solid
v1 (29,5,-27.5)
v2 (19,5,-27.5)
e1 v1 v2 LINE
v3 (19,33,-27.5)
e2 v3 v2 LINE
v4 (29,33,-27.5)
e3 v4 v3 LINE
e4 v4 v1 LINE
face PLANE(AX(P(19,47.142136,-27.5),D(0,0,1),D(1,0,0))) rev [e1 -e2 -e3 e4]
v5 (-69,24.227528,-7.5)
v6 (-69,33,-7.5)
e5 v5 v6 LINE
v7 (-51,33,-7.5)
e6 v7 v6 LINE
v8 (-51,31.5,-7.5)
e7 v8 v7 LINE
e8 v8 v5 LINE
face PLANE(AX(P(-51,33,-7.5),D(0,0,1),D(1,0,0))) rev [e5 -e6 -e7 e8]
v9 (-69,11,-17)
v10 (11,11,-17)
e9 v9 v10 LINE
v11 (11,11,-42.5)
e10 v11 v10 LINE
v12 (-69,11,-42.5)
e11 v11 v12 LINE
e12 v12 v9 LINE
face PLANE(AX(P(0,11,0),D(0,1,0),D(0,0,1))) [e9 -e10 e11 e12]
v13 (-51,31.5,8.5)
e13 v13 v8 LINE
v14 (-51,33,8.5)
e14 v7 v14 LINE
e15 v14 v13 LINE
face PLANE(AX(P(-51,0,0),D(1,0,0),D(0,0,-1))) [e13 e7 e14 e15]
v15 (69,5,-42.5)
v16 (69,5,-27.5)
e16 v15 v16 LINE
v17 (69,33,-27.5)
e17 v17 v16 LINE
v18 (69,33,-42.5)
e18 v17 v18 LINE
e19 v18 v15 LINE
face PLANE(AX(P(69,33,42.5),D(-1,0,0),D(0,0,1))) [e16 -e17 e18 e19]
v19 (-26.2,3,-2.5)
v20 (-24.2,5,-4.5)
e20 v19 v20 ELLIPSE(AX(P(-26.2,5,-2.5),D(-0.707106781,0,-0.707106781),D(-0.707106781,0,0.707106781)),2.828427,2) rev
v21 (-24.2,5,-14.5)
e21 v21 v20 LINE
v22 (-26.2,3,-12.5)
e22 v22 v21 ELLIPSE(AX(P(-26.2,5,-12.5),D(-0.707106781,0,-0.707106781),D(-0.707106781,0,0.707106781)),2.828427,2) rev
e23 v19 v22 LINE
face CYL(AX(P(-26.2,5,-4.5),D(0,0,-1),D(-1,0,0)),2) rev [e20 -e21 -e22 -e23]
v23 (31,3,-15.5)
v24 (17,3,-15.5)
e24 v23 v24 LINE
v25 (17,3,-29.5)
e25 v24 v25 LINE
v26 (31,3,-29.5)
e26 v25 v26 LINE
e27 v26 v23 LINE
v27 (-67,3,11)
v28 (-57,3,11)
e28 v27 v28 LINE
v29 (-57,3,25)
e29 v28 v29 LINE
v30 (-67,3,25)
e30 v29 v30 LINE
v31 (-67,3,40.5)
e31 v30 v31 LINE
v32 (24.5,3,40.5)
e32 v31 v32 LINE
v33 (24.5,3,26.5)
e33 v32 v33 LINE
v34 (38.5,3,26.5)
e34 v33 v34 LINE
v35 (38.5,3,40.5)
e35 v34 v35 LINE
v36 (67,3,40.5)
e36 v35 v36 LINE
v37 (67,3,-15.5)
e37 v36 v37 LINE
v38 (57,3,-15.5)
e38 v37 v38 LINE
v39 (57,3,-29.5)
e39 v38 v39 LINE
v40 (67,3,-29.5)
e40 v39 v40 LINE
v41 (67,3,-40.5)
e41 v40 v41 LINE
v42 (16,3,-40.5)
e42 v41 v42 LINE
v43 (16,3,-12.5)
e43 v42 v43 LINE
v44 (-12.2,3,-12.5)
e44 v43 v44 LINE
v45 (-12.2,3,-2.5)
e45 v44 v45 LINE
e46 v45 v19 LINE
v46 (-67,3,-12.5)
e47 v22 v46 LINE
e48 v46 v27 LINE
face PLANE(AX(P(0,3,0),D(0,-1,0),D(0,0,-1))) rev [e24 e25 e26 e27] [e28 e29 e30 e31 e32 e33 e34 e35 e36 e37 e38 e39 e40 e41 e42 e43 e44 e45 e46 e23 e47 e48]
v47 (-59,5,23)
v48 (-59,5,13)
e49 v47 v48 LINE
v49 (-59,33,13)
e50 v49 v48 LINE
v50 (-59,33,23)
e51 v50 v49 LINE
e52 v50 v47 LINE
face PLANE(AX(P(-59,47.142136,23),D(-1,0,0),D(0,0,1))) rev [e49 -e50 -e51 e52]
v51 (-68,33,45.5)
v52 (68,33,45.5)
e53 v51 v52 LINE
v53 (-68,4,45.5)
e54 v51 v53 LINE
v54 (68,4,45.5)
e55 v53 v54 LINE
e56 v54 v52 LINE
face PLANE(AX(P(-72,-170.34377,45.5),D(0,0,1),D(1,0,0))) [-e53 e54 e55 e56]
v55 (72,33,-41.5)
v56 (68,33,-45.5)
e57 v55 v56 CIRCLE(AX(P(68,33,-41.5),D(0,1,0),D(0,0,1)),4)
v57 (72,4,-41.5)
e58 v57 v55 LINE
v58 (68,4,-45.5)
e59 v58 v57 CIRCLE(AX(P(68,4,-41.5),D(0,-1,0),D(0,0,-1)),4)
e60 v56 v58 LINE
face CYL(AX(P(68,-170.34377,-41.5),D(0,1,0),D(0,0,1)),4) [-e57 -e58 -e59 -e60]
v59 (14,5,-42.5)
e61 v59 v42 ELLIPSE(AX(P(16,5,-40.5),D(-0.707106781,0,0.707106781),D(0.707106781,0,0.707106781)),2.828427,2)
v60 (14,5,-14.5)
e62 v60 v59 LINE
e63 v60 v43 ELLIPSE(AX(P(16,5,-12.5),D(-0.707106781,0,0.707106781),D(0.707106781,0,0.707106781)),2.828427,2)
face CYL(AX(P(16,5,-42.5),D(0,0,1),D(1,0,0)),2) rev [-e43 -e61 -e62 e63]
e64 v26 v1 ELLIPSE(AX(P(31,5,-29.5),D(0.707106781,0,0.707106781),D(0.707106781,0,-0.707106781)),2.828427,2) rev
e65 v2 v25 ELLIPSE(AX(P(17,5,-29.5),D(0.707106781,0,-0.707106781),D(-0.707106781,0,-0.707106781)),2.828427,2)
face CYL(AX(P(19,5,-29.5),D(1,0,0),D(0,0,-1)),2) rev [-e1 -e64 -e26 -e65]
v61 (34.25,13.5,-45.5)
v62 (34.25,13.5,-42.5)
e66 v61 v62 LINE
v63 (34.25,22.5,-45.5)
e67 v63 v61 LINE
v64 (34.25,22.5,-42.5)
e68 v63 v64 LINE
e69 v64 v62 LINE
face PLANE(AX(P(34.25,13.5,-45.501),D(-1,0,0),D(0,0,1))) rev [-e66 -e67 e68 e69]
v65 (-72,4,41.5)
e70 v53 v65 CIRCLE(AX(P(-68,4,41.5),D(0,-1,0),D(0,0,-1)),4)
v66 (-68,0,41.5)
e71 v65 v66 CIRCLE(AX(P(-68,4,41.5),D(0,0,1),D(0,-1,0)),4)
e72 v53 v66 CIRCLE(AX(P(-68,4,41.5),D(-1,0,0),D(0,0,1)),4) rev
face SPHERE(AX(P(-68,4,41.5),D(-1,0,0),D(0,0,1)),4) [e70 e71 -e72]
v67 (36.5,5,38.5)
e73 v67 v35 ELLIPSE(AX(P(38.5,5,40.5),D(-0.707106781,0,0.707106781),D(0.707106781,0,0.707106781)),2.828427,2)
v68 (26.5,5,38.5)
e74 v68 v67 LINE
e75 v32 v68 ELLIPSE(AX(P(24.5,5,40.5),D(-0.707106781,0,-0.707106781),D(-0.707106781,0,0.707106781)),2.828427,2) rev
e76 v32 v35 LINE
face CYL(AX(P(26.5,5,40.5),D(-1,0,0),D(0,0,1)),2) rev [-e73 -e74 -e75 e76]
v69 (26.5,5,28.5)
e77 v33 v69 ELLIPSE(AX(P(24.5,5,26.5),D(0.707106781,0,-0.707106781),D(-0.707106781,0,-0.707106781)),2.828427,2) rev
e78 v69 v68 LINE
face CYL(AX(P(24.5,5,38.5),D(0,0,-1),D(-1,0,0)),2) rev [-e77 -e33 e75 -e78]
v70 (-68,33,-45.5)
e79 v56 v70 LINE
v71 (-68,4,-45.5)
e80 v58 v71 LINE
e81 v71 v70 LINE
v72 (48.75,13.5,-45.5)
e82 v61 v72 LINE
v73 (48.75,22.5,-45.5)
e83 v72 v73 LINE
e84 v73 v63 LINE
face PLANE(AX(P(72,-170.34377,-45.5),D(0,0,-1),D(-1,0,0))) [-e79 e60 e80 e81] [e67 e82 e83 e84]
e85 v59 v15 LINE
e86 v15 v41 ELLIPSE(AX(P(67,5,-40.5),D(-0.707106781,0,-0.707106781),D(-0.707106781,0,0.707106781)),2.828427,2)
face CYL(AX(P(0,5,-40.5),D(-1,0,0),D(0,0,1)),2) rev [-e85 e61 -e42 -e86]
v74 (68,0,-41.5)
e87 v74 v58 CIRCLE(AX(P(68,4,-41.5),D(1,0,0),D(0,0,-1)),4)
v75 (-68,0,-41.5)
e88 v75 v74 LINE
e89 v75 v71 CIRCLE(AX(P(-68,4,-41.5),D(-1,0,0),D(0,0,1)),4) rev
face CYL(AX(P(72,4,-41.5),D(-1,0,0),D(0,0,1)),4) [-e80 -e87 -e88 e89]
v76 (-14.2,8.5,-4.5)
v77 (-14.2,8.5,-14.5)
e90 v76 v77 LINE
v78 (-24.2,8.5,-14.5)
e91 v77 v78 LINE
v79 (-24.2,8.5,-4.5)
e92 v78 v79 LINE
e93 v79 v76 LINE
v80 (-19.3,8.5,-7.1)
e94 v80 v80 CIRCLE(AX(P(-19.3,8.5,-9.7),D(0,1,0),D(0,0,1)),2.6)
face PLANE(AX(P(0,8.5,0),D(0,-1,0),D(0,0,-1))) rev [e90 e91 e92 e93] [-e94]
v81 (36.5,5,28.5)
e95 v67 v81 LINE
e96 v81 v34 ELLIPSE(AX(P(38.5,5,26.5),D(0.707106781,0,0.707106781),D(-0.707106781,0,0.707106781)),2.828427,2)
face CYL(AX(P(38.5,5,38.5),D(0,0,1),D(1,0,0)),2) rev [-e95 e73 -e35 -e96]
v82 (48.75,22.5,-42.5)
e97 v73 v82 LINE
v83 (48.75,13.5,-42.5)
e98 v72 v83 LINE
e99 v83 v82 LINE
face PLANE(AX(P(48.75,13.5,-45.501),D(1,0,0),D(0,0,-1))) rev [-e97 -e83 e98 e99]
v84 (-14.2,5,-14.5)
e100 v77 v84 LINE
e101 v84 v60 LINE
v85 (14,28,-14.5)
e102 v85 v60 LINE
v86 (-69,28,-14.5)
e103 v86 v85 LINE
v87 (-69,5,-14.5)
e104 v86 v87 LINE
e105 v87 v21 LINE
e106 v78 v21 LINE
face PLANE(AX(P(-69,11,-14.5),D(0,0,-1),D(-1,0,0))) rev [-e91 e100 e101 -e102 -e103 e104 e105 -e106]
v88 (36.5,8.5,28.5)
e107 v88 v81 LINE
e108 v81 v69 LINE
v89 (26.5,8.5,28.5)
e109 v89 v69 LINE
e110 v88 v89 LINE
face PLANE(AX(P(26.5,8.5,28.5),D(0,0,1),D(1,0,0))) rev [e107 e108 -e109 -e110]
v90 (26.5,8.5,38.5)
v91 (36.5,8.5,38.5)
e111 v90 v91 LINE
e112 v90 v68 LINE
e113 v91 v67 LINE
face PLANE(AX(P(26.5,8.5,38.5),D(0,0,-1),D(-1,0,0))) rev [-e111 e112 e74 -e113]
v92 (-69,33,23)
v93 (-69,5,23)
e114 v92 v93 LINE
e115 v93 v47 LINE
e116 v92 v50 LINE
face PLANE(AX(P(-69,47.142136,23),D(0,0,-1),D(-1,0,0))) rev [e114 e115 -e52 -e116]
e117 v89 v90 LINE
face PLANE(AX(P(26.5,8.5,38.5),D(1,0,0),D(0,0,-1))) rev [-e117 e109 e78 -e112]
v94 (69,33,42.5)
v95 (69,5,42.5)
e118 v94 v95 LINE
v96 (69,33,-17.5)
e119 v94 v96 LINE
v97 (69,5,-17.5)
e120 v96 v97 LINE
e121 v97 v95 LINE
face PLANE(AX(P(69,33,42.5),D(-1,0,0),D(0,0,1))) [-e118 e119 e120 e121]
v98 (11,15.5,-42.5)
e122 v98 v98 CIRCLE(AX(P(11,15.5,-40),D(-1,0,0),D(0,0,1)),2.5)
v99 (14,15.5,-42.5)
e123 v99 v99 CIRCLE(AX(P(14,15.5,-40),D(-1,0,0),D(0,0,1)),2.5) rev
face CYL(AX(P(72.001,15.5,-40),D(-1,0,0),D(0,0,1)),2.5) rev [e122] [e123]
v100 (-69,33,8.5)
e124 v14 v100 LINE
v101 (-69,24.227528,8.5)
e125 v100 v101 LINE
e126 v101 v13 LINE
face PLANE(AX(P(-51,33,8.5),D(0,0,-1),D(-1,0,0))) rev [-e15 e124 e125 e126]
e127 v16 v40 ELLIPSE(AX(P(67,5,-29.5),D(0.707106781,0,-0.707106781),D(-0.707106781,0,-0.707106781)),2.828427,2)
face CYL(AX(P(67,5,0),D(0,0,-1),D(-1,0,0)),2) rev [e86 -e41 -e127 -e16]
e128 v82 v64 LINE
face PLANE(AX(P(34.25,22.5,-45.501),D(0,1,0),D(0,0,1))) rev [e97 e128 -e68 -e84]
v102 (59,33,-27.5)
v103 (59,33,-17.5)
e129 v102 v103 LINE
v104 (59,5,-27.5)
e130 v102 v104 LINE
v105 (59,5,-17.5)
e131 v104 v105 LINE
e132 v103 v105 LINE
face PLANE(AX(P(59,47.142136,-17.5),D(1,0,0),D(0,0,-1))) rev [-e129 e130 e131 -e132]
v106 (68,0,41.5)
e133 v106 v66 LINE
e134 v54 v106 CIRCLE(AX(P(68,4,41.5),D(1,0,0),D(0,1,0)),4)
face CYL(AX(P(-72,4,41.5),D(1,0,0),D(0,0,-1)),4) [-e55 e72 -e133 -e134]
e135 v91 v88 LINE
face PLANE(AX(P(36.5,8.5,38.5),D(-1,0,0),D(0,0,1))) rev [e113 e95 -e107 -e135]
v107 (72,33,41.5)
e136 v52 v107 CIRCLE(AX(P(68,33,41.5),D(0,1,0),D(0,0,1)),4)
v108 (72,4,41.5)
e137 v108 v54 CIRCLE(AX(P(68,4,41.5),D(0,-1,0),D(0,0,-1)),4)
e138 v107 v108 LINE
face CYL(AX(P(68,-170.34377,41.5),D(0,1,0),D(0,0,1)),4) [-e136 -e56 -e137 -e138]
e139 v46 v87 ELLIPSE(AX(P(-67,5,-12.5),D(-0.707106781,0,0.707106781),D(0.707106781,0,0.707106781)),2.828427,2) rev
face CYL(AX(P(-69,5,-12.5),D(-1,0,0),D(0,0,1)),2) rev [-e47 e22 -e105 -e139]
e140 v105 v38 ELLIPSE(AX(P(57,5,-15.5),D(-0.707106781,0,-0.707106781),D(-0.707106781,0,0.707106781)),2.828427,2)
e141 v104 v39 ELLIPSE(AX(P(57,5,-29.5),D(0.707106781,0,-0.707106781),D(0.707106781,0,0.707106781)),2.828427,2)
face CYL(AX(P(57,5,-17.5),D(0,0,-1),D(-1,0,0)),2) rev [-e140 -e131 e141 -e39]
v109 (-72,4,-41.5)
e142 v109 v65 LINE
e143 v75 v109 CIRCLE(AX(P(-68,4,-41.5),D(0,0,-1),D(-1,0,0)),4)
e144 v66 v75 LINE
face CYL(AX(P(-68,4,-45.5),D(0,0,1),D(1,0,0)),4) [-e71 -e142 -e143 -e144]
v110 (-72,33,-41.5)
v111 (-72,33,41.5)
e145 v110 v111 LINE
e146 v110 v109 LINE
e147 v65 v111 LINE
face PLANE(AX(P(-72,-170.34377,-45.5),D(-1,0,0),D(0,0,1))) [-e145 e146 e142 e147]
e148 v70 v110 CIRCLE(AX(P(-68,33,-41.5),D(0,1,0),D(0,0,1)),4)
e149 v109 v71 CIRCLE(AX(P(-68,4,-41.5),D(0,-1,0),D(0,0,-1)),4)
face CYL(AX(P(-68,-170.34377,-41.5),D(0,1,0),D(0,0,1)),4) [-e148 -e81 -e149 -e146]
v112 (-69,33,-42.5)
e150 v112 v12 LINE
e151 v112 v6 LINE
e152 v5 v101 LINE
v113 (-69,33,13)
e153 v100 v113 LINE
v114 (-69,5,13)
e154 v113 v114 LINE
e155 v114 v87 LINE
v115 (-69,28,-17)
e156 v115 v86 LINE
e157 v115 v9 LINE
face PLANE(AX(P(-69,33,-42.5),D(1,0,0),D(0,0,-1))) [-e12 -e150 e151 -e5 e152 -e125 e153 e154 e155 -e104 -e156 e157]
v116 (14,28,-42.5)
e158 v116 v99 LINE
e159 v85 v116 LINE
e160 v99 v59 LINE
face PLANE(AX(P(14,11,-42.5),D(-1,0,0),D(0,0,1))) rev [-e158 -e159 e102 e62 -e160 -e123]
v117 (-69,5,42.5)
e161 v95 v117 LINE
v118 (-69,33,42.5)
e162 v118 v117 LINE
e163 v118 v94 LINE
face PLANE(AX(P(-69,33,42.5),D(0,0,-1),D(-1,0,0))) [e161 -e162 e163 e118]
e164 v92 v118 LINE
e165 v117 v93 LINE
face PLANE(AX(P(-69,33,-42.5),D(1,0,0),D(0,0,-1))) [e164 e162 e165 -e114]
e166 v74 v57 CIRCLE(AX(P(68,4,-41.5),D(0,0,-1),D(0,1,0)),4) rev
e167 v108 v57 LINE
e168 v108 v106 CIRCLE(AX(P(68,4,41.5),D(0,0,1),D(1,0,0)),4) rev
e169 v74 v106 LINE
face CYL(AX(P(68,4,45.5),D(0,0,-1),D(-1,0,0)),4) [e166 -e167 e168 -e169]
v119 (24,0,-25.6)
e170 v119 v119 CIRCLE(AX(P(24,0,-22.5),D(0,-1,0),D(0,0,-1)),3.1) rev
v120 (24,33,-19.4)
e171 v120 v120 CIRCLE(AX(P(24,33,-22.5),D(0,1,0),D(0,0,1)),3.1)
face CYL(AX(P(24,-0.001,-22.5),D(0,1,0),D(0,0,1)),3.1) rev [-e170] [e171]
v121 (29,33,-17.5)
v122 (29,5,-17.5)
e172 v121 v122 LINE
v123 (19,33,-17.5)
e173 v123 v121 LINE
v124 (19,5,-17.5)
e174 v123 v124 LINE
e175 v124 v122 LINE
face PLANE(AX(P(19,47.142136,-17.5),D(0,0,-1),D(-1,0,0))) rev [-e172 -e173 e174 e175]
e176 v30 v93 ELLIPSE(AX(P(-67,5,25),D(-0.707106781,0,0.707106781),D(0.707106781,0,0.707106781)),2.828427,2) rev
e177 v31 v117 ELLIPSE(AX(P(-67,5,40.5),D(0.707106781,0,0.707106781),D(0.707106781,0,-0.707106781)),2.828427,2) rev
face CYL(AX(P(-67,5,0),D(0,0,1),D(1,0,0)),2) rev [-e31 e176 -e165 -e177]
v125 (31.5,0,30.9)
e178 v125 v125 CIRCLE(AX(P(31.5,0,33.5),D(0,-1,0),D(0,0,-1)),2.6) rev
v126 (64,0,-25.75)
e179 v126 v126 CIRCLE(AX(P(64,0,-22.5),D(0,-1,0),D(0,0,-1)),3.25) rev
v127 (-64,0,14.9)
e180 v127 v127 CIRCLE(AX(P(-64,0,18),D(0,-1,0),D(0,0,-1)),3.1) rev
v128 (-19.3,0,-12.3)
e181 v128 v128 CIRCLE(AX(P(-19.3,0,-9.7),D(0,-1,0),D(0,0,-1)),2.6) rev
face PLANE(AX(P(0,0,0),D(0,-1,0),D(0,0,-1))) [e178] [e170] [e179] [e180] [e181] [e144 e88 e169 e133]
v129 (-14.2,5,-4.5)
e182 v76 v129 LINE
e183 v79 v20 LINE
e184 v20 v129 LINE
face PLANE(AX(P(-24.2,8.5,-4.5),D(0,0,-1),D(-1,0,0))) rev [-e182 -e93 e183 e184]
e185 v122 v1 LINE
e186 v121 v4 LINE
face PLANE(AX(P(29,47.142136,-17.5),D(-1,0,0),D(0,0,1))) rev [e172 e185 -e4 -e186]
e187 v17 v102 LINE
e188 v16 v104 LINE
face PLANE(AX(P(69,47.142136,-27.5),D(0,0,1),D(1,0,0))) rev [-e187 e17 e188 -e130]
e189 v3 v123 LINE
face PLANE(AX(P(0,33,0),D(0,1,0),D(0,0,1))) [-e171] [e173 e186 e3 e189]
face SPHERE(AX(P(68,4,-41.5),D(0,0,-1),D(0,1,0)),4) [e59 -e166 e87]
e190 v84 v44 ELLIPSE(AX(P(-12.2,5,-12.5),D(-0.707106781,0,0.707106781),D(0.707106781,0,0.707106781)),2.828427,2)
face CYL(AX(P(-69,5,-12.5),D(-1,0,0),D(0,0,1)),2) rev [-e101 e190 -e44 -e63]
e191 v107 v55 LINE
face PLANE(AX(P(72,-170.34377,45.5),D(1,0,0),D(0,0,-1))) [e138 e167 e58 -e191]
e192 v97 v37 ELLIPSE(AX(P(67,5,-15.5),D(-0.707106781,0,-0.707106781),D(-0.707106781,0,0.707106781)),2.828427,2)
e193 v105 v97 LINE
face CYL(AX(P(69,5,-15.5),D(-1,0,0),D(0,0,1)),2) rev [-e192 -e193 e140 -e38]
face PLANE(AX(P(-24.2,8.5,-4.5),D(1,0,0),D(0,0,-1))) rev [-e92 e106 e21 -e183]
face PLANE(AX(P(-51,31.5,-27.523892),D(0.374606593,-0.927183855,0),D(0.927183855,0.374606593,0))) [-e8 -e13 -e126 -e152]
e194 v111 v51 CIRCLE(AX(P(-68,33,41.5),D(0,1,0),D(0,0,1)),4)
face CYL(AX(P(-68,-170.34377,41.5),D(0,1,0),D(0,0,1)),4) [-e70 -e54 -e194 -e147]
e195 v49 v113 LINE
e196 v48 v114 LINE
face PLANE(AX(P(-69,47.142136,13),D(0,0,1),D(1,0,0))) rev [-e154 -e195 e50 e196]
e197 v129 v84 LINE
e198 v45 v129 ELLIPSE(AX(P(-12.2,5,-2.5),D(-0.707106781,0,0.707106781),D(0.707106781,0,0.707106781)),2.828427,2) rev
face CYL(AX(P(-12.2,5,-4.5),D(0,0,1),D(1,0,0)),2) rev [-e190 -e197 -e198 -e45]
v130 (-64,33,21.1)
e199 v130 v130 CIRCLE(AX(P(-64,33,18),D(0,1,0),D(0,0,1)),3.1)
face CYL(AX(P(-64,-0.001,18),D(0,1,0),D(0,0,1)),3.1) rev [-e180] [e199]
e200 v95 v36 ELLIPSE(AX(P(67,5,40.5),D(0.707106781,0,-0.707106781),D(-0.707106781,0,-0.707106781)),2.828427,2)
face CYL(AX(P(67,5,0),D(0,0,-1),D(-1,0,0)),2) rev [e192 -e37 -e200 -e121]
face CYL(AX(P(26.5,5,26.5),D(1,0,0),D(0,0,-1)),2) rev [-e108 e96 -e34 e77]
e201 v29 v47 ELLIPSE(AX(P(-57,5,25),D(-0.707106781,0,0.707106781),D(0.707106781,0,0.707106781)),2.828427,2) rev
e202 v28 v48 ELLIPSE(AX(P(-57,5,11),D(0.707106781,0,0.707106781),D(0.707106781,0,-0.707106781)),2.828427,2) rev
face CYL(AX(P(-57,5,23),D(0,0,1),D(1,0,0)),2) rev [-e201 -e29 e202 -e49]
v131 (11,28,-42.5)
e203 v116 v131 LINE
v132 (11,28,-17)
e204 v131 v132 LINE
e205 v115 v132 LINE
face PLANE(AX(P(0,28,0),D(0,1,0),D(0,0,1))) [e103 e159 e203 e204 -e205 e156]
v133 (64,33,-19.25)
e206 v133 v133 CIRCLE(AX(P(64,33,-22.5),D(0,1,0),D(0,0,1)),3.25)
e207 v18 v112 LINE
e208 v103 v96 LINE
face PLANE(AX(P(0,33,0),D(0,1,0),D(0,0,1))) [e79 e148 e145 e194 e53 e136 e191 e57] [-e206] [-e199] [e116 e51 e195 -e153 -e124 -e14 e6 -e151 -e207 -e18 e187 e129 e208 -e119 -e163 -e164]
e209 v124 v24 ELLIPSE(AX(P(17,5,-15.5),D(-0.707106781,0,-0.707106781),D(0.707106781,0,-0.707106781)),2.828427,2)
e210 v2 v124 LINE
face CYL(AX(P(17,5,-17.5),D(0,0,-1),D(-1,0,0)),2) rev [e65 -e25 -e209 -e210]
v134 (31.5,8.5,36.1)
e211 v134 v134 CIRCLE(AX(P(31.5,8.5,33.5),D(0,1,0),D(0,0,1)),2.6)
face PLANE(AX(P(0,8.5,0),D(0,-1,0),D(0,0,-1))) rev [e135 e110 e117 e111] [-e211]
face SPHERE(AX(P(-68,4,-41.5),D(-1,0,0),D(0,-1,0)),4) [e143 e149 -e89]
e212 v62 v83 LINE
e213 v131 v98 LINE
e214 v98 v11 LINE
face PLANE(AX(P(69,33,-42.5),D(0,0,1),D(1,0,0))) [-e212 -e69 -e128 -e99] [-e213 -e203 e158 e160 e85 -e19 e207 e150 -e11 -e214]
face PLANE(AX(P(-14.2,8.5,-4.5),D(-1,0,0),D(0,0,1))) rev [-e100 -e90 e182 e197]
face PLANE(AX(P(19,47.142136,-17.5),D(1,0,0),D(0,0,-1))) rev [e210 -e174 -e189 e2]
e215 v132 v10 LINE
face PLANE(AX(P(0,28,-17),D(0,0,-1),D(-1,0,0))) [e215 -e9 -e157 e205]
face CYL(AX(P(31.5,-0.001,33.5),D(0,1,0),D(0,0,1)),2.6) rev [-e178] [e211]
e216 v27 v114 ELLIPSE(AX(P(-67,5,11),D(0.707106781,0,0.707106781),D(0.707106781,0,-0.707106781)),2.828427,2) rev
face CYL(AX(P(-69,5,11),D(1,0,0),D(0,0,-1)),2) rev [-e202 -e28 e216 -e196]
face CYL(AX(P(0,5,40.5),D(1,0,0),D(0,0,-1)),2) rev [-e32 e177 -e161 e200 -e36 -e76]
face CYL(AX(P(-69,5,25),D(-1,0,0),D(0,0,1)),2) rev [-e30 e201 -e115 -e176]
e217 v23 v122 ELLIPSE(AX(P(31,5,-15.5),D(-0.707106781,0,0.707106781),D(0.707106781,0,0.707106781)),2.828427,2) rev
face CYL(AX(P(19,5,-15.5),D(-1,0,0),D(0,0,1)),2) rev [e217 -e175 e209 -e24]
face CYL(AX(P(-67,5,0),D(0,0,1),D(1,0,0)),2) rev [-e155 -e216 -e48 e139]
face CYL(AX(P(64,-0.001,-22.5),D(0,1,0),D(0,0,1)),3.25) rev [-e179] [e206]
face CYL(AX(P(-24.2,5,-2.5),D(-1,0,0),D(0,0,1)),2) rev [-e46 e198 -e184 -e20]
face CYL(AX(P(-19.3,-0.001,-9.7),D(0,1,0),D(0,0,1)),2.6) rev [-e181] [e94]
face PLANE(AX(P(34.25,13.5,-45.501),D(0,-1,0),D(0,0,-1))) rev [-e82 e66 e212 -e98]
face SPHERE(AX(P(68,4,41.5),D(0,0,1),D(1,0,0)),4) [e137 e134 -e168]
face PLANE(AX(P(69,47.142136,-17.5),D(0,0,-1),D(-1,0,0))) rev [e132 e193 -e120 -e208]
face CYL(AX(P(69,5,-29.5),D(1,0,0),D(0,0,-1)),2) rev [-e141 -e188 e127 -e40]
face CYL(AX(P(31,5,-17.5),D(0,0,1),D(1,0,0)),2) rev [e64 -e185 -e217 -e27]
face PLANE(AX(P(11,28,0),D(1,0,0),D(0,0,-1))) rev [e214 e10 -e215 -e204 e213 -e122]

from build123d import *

# Parameters (mm, degrees)
CROQUIS1_W               = 138
CROQUIS1_H               = 85
SALIENTE_EXTRUIR1_DEPTH  = 3
CROQUIS3_W               = 144
CROQUIS3_H               = 91
CROQUIS3_W_2             = 138
CROQUIS3_H_2             = 85
SALIENTE_EXTRUIR3_DEPTH  = 3
CROQUIS7_W               = 144
CROQUIS7_H               = 91
CROQUIS7_W_2             = 138
CROQUIS7_H_2             = 85
SALIENTE_EXTRUIR4_DEPTH  = 30
CROQUIS8_W               = 10
CROQUIS8_H               = 10
SALIENTE_EXTRUIR5_DEPTH  = 5.5
CROQUIS9_W               = 16
CROQUIS9_H               = 1.5
SALIENTE_EXTRUIR6_DEPTH  = 18
SALIENTE_EXTRUIR7_DEPTH  = 16
CROQUIS11_W              = 83
CROQUIS11_H              = 28
SALIENTE_EXTRUIR8_DEPTH  = 8
SALIENTE_EXTRUIR9_DEPTH  = 17
CORTAR_EXTRUIR1_REACH    = 102.241
CROQUIS14_R              = 2.5
CORTAR_EXTRUIR2_REACH    = 90.626
CROQUIS15_R              = 2.6
CORTAR_EXTRUIR3_REACH    = 120.393
CROQUIS16_W              = 14.5
CROQUIS16_H              = 9
CROQUIS17_W              = 10
CROQUIS17_H              = 10
SALIENTE_EXTRUIR10_DEPTH = 30
CORTAR_EXTRUIR4_REACH    = 93.341
CROQUIS18_R              = 3.1
CROQUIS18_R_2            = 3.25
REDONDEO1_R              = 2
REDONDEO2_R              = 4
CORTAR_EXTRUIR5_REACH    = 90.626
CROQUIS21_R              = 2.6


with BuildPart() as part:
    # Croquis1 → Saliente-Extruir1 (new body)
    with BuildSketch(Plane(origin=(0, 0, 0), x_dir=(1, 0, 0), z_dir=(0, 1, 0))):
        Rectangle(CROQUIS1_W, CROQUIS1_H)
    extrude(amount=SALIENTE_EXTRUIR1_DEPTH)

    # Croquis3 → Saliente-Extruir3 (add)
    with BuildSketch(Plane(origin=(0, 3, 0), x_dir=(1, 0, 0), z_dir=(0, 1, 0))):
        Rectangle(CROQUIS3_W, CROQUIS3_H)
        Rectangle(CROQUIS3_W_2, CROQUIS3_H_2, mode=Mode.SUBTRACT)
    extrude(amount=-SALIENTE_EXTRUIR3_DEPTH)

    # Croquis7 → Saliente-Extruir4 (add)
    with BuildSketch(Plane(origin=(0, 3, 0), x_dir=(1, 0, 0), z_dir=(0, 1, 0))):
        Rectangle(CROQUIS7_W, CROQUIS7_H)
        Rectangle(CROQUIS7_W_2, CROQUIS7_H_2, mode=Mode.SUBTRACT)
    extrude(amount=SALIENTE_EXTRUIR4_DEPTH)

    # Croquis8 → Saliente-Extruir5 (add)
    with BuildSketch(Plane(origin=(0, 3, 0), x_dir=(1, 0, 0), z_dir=(0, 1, 0))):
        with Locations((-19.2, 9.5)):
            Rectangle(CROQUIS8_W, CROQUIS8_H)
        with Locations((31.5, -33.5)):
            Rectangle(CROQUIS8_W, CROQUIS8_H)
    extrude(amount=SALIENTE_EXTRUIR5_DEPTH)

    # Croquis9 → Saliente-Extruir6 (add)
    with BuildSketch(Plane(origin=(-69, 0, 0), x_dir=(0, 0, -1), z_dir=(1, 0, 0))):
        with Locations((-0.5, 32.25)):
            Rectangle(CROQUIS9_W, CROQUIS9_H)
    extrude(amount=SALIENTE_EXTRUIR6_DEPTH)

    # Croquis10 → Saliente-Extruir7 (add)
    with BuildSketch(Plane.XY.offset(8.5)):
        Polygon((-51, 31.5), (-69, 24.227527935), (-69, 33), (-51, 33), align=None)
    extrude(amount=-SALIENTE_EXTRUIR7_DEPTH)

    # Croquis11 → Saliente-Extruir8 (add)
    with BuildSketch(Plane(origin=(0, 3, 0), x_dir=(1, 0, 0), z_dir=(0, 1, 0))):
        with Locations((-27.5, 28.5)):
            Rectangle(CROQUIS11_W, CROQUIS11_H)
    extrude(amount=SALIENTE_EXTRUIR8_DEPTH)

    # Croquis12 → Saliente-Extruir9 (add)
    with BuildSketch(Plane(origin=(0, 11, 0), x_dir=(1, 0, 0), z_dir=(0, 1, 0))):
        Polygon((14, 42.5), (11, 42.5), (11, 17), (-69, 17), (-69, 14.5), (14, 14.5), align=None)
    extrude(amount=SALIENTE_EXTRUIR9_DEPTH)

    # Croquis14 → Cortar-Extruir1 (cut, up to next)
    with BuildSketch(Plane.ZY.offset(-11), mode=Mode.PRIVATE) as cortar_extruir1_sk1:
        with Locations(Location((-40, 15.5, 0), (0, 0, 180))):
            Circle(CROQUIS14_R)
    cortar_extruir1_tool1 = extrude(cortar_extruir1_sk1.sketch, amount=-CORTAR_EXTRUIR1_REACH, mode=Mode.PRIVATE) & part.part
    add(cortar_extruir1_tool1.solids().sort_by_distance((11, 15.5, -40))[0], mode=Mode.SUBTRACT)

    # Croquis15 → Cortar-Extruir2 (cut, up to next)
    with BuildSketch(Plane(origin=(0, 8.5, 0), x_dir=(1, 0, 0), z_dir=(0, 1, 0)), mode=Mode.PRIVATE) as cortar_extruir2_sk1:
        with Locations(Location((31.5, -33.5, 0), (0, 0, 270))):
            Circle(CROQUIS15_R)
    cortar_extruir2_tool1 = extrude(cortar_extruir2_sk1.sketch, amount=-CORTAR_EXTRUIR2_REACH, mode=Mode.PRIVATE) & part.part
    add(cortar_extruir2_tool1.solids().sort_by_distance((31.5, 8.5, 33.5))[0], mode=Mode.SUBTRACT)

    # Croquis16 → Cortar-Extruir3 (cut, up to next)
    with BuildSketch(Plane.XY.offset(-42.5), mode=Mode.PRIVATE) as cortar_extruir3_sk1:
        with Locations((41.5, 18)):
            Rectangle(CROQUIS16_W, CROQUIS16_H)
    cortar_extruir3_tool1 = extrude(cortar_extruir3_sk1.sketch, amount=-CORTAR_EXTRUIR3_REACH, mode=Mode.PRIVATE) & part.part
    add(cortar_extruir3_tool1.solids().sort_by_distance((41.5, 18, -42.5))[0], mode=Mode.SUBTRACT)

    # Croquis17 → Saliente-Extruir10 (add)
    with BuildSketch(Plane(origin=(0, 3, 0), x_dir=(1, 0, 0), z_dir=(0, 1, 0))):
        with Locations((-64, -18)):
            Rectangle(CROQUIS17_W, CROQUIS17_H)
        with Locations((64, 22.5)):
            Rectangle(CROQUIS17_W, CROQUIS17_H)
        with Locations((24, 22.5)):
            Rectangle(CROQUIS17_W, CROQUIS17_H)
    extrude(amount=SALIENTE_EXTRUIR10_DEPTH)

    # Croquis18 → Cortar-Extruir4 (cut, up to next)
    with BuildSketch(Plane(origin=(0, 33, 0), x_dir=(1, 0, 0), z_dir=(0, 1, 0)), mode=Mode.PRIVATE) as cortar_extruir4_sk1:
        with Locations(Location((-64, -18, 0), (0, 0, 270))):
            Circle(CROQUIS18_R)
    cortar_extruir4_tool1 = extrude(cortar_extruir4_sk1.sketch, amount=-CORTAR_EXTRUIR4_REACH, mode=Mode.PRIVATE) & part.part
    # Croquis18 → Cortar-Extruir4 (cut, up to next)
    with BuildSketch(Plane(origin=(0, 33, 0), x_dir=(1, 0, 0), z_dir=(0, 1, 0)), mode=Mode.PRIVATE) as cortar_extruir4_sk2:
        with Locations(Location((24, 22.5, 0), (0, 0, 270))):
            Circle(CROQUIS18_R)
    cortar_extruir4_tool2 = extrude(cortar_extruir4_sk2.sketch, amount=-CORTAR_EXTRUIR4_REACH, mode=Mode.PRIVATE) & part.part
    # Croquis18 → Cortar-Extruir4 (cut, up to next)
    with BuildSketch(Plane(origin=(0, 33, 0), x_dir=(1, 0, 0), z_dir=(0, 1, 0)), mode=Mode.PRIVATE) as cortar_extruir4_sk3:
        with Locations(Location((64, 22.5, 0), (0, 0, 270))):
            Circle(CROQUIS18_R_2)
    cortar_extruir4_tool3 = extrude(cortar_extruir4_sk3.sketch, amount=-CORTAR_EXTRUIR4_REACH, mode=Mode.PRIVATE) & part.part
    add(cortar_extruir4_tool1.solids().sort_by_distance((-64, 33, 18))[0], mode=Mode.SUBTRACT)
    add(cortar_extruir4_tool2.solids().sort_by_distance((24, 33, -22.5))[0], mode=Mode.SUBTRACT)
    add(cortar_extruir4_tool3.solids().sort_by_distance((64, 33, -22.5))[0], mode=Mode.SUBTRACT)

    # Redondeo1
    redondeo1_edges = [part.edges().sort_by_distance(p)[0] for p in [
        (-69, 3, -0.75),
        (-0.1, 3, -14.5),
        (-46.6, 3, -14.5),
        (14, 3, -28.5),
        (-69, 3, 32.75),
        (-64, 3, 23),
        (-59, 3, 18),
        (-64, 3, 13),
        (69, 3, -35),
        (64, 3, -27.5),
        (59, 3, -22.5),
        (64, 3, -17.5),
        (19, 3, -22.5),
        (24, 3, -17.5),
        (29, 3, -22.5),
        (24, 3, -27.5),
        (0, 3, 42.5),
        (69, 3, 12.5),
        (41.5, 3, -42.5),
        (-14.2, 3, -9.5),
        (-24.2, 3, -9.5),
        (-19.2, 3, -4.5),
        (36.5, 3, 33.5),
        (31.5, 3, 28.5),
        (26.5, 3, 33.5),
        (31.5, 3, 38.5),
    ]]
    fillet(redondeo1_edges, radius=REDONDEO1_R - 0.0001)  # a hair under: the kernel refuses the full size

    # Redondeo2
    redondeo2_edges = [part.edges().sort_by_distance(p)[0] for p in [
        (0, 0, 45.5),
        (72, 16.5, 45.5),
        (-72, 0, 0),
        (-72, 16.5, 45.5),
        (0, 0, -45.5),
        (-72, 16.5, -45.5),
        (72, 0, 0),
        (72, 16.5, -45.5),
    ]]
    fillet(redondeo2_edges, radius=REDONDEO2_R)

    # Croquis21 → Cortar-Extruir5 (cut, up to next)
    with BuildSketch(Plane(origin=(0, 8.5, 0), x_dir=(1, 0, 0), z_dir=(0, 1, 0)), mode=Mode.PRIVATE) as cortar_extruir5_sk1:
        with Locations(Location((-19.3, 9.7, 0), (0, 0, 270))):
            Circle(CROQUIS21_R)
    cortar_extruir5_tool1 = extrude(cortar_extruir5_sk1.sketch, amount=-CORTAR_EXTRUIR5_REACH, mode=Mode.PRIVATE) & part.part
    add(cortar_extruir5_tool1.solids().sort_by_distance((-19.3, 8.5, -9.7))[0], mode=Mode.SUBTRACT)


solid = part.part
